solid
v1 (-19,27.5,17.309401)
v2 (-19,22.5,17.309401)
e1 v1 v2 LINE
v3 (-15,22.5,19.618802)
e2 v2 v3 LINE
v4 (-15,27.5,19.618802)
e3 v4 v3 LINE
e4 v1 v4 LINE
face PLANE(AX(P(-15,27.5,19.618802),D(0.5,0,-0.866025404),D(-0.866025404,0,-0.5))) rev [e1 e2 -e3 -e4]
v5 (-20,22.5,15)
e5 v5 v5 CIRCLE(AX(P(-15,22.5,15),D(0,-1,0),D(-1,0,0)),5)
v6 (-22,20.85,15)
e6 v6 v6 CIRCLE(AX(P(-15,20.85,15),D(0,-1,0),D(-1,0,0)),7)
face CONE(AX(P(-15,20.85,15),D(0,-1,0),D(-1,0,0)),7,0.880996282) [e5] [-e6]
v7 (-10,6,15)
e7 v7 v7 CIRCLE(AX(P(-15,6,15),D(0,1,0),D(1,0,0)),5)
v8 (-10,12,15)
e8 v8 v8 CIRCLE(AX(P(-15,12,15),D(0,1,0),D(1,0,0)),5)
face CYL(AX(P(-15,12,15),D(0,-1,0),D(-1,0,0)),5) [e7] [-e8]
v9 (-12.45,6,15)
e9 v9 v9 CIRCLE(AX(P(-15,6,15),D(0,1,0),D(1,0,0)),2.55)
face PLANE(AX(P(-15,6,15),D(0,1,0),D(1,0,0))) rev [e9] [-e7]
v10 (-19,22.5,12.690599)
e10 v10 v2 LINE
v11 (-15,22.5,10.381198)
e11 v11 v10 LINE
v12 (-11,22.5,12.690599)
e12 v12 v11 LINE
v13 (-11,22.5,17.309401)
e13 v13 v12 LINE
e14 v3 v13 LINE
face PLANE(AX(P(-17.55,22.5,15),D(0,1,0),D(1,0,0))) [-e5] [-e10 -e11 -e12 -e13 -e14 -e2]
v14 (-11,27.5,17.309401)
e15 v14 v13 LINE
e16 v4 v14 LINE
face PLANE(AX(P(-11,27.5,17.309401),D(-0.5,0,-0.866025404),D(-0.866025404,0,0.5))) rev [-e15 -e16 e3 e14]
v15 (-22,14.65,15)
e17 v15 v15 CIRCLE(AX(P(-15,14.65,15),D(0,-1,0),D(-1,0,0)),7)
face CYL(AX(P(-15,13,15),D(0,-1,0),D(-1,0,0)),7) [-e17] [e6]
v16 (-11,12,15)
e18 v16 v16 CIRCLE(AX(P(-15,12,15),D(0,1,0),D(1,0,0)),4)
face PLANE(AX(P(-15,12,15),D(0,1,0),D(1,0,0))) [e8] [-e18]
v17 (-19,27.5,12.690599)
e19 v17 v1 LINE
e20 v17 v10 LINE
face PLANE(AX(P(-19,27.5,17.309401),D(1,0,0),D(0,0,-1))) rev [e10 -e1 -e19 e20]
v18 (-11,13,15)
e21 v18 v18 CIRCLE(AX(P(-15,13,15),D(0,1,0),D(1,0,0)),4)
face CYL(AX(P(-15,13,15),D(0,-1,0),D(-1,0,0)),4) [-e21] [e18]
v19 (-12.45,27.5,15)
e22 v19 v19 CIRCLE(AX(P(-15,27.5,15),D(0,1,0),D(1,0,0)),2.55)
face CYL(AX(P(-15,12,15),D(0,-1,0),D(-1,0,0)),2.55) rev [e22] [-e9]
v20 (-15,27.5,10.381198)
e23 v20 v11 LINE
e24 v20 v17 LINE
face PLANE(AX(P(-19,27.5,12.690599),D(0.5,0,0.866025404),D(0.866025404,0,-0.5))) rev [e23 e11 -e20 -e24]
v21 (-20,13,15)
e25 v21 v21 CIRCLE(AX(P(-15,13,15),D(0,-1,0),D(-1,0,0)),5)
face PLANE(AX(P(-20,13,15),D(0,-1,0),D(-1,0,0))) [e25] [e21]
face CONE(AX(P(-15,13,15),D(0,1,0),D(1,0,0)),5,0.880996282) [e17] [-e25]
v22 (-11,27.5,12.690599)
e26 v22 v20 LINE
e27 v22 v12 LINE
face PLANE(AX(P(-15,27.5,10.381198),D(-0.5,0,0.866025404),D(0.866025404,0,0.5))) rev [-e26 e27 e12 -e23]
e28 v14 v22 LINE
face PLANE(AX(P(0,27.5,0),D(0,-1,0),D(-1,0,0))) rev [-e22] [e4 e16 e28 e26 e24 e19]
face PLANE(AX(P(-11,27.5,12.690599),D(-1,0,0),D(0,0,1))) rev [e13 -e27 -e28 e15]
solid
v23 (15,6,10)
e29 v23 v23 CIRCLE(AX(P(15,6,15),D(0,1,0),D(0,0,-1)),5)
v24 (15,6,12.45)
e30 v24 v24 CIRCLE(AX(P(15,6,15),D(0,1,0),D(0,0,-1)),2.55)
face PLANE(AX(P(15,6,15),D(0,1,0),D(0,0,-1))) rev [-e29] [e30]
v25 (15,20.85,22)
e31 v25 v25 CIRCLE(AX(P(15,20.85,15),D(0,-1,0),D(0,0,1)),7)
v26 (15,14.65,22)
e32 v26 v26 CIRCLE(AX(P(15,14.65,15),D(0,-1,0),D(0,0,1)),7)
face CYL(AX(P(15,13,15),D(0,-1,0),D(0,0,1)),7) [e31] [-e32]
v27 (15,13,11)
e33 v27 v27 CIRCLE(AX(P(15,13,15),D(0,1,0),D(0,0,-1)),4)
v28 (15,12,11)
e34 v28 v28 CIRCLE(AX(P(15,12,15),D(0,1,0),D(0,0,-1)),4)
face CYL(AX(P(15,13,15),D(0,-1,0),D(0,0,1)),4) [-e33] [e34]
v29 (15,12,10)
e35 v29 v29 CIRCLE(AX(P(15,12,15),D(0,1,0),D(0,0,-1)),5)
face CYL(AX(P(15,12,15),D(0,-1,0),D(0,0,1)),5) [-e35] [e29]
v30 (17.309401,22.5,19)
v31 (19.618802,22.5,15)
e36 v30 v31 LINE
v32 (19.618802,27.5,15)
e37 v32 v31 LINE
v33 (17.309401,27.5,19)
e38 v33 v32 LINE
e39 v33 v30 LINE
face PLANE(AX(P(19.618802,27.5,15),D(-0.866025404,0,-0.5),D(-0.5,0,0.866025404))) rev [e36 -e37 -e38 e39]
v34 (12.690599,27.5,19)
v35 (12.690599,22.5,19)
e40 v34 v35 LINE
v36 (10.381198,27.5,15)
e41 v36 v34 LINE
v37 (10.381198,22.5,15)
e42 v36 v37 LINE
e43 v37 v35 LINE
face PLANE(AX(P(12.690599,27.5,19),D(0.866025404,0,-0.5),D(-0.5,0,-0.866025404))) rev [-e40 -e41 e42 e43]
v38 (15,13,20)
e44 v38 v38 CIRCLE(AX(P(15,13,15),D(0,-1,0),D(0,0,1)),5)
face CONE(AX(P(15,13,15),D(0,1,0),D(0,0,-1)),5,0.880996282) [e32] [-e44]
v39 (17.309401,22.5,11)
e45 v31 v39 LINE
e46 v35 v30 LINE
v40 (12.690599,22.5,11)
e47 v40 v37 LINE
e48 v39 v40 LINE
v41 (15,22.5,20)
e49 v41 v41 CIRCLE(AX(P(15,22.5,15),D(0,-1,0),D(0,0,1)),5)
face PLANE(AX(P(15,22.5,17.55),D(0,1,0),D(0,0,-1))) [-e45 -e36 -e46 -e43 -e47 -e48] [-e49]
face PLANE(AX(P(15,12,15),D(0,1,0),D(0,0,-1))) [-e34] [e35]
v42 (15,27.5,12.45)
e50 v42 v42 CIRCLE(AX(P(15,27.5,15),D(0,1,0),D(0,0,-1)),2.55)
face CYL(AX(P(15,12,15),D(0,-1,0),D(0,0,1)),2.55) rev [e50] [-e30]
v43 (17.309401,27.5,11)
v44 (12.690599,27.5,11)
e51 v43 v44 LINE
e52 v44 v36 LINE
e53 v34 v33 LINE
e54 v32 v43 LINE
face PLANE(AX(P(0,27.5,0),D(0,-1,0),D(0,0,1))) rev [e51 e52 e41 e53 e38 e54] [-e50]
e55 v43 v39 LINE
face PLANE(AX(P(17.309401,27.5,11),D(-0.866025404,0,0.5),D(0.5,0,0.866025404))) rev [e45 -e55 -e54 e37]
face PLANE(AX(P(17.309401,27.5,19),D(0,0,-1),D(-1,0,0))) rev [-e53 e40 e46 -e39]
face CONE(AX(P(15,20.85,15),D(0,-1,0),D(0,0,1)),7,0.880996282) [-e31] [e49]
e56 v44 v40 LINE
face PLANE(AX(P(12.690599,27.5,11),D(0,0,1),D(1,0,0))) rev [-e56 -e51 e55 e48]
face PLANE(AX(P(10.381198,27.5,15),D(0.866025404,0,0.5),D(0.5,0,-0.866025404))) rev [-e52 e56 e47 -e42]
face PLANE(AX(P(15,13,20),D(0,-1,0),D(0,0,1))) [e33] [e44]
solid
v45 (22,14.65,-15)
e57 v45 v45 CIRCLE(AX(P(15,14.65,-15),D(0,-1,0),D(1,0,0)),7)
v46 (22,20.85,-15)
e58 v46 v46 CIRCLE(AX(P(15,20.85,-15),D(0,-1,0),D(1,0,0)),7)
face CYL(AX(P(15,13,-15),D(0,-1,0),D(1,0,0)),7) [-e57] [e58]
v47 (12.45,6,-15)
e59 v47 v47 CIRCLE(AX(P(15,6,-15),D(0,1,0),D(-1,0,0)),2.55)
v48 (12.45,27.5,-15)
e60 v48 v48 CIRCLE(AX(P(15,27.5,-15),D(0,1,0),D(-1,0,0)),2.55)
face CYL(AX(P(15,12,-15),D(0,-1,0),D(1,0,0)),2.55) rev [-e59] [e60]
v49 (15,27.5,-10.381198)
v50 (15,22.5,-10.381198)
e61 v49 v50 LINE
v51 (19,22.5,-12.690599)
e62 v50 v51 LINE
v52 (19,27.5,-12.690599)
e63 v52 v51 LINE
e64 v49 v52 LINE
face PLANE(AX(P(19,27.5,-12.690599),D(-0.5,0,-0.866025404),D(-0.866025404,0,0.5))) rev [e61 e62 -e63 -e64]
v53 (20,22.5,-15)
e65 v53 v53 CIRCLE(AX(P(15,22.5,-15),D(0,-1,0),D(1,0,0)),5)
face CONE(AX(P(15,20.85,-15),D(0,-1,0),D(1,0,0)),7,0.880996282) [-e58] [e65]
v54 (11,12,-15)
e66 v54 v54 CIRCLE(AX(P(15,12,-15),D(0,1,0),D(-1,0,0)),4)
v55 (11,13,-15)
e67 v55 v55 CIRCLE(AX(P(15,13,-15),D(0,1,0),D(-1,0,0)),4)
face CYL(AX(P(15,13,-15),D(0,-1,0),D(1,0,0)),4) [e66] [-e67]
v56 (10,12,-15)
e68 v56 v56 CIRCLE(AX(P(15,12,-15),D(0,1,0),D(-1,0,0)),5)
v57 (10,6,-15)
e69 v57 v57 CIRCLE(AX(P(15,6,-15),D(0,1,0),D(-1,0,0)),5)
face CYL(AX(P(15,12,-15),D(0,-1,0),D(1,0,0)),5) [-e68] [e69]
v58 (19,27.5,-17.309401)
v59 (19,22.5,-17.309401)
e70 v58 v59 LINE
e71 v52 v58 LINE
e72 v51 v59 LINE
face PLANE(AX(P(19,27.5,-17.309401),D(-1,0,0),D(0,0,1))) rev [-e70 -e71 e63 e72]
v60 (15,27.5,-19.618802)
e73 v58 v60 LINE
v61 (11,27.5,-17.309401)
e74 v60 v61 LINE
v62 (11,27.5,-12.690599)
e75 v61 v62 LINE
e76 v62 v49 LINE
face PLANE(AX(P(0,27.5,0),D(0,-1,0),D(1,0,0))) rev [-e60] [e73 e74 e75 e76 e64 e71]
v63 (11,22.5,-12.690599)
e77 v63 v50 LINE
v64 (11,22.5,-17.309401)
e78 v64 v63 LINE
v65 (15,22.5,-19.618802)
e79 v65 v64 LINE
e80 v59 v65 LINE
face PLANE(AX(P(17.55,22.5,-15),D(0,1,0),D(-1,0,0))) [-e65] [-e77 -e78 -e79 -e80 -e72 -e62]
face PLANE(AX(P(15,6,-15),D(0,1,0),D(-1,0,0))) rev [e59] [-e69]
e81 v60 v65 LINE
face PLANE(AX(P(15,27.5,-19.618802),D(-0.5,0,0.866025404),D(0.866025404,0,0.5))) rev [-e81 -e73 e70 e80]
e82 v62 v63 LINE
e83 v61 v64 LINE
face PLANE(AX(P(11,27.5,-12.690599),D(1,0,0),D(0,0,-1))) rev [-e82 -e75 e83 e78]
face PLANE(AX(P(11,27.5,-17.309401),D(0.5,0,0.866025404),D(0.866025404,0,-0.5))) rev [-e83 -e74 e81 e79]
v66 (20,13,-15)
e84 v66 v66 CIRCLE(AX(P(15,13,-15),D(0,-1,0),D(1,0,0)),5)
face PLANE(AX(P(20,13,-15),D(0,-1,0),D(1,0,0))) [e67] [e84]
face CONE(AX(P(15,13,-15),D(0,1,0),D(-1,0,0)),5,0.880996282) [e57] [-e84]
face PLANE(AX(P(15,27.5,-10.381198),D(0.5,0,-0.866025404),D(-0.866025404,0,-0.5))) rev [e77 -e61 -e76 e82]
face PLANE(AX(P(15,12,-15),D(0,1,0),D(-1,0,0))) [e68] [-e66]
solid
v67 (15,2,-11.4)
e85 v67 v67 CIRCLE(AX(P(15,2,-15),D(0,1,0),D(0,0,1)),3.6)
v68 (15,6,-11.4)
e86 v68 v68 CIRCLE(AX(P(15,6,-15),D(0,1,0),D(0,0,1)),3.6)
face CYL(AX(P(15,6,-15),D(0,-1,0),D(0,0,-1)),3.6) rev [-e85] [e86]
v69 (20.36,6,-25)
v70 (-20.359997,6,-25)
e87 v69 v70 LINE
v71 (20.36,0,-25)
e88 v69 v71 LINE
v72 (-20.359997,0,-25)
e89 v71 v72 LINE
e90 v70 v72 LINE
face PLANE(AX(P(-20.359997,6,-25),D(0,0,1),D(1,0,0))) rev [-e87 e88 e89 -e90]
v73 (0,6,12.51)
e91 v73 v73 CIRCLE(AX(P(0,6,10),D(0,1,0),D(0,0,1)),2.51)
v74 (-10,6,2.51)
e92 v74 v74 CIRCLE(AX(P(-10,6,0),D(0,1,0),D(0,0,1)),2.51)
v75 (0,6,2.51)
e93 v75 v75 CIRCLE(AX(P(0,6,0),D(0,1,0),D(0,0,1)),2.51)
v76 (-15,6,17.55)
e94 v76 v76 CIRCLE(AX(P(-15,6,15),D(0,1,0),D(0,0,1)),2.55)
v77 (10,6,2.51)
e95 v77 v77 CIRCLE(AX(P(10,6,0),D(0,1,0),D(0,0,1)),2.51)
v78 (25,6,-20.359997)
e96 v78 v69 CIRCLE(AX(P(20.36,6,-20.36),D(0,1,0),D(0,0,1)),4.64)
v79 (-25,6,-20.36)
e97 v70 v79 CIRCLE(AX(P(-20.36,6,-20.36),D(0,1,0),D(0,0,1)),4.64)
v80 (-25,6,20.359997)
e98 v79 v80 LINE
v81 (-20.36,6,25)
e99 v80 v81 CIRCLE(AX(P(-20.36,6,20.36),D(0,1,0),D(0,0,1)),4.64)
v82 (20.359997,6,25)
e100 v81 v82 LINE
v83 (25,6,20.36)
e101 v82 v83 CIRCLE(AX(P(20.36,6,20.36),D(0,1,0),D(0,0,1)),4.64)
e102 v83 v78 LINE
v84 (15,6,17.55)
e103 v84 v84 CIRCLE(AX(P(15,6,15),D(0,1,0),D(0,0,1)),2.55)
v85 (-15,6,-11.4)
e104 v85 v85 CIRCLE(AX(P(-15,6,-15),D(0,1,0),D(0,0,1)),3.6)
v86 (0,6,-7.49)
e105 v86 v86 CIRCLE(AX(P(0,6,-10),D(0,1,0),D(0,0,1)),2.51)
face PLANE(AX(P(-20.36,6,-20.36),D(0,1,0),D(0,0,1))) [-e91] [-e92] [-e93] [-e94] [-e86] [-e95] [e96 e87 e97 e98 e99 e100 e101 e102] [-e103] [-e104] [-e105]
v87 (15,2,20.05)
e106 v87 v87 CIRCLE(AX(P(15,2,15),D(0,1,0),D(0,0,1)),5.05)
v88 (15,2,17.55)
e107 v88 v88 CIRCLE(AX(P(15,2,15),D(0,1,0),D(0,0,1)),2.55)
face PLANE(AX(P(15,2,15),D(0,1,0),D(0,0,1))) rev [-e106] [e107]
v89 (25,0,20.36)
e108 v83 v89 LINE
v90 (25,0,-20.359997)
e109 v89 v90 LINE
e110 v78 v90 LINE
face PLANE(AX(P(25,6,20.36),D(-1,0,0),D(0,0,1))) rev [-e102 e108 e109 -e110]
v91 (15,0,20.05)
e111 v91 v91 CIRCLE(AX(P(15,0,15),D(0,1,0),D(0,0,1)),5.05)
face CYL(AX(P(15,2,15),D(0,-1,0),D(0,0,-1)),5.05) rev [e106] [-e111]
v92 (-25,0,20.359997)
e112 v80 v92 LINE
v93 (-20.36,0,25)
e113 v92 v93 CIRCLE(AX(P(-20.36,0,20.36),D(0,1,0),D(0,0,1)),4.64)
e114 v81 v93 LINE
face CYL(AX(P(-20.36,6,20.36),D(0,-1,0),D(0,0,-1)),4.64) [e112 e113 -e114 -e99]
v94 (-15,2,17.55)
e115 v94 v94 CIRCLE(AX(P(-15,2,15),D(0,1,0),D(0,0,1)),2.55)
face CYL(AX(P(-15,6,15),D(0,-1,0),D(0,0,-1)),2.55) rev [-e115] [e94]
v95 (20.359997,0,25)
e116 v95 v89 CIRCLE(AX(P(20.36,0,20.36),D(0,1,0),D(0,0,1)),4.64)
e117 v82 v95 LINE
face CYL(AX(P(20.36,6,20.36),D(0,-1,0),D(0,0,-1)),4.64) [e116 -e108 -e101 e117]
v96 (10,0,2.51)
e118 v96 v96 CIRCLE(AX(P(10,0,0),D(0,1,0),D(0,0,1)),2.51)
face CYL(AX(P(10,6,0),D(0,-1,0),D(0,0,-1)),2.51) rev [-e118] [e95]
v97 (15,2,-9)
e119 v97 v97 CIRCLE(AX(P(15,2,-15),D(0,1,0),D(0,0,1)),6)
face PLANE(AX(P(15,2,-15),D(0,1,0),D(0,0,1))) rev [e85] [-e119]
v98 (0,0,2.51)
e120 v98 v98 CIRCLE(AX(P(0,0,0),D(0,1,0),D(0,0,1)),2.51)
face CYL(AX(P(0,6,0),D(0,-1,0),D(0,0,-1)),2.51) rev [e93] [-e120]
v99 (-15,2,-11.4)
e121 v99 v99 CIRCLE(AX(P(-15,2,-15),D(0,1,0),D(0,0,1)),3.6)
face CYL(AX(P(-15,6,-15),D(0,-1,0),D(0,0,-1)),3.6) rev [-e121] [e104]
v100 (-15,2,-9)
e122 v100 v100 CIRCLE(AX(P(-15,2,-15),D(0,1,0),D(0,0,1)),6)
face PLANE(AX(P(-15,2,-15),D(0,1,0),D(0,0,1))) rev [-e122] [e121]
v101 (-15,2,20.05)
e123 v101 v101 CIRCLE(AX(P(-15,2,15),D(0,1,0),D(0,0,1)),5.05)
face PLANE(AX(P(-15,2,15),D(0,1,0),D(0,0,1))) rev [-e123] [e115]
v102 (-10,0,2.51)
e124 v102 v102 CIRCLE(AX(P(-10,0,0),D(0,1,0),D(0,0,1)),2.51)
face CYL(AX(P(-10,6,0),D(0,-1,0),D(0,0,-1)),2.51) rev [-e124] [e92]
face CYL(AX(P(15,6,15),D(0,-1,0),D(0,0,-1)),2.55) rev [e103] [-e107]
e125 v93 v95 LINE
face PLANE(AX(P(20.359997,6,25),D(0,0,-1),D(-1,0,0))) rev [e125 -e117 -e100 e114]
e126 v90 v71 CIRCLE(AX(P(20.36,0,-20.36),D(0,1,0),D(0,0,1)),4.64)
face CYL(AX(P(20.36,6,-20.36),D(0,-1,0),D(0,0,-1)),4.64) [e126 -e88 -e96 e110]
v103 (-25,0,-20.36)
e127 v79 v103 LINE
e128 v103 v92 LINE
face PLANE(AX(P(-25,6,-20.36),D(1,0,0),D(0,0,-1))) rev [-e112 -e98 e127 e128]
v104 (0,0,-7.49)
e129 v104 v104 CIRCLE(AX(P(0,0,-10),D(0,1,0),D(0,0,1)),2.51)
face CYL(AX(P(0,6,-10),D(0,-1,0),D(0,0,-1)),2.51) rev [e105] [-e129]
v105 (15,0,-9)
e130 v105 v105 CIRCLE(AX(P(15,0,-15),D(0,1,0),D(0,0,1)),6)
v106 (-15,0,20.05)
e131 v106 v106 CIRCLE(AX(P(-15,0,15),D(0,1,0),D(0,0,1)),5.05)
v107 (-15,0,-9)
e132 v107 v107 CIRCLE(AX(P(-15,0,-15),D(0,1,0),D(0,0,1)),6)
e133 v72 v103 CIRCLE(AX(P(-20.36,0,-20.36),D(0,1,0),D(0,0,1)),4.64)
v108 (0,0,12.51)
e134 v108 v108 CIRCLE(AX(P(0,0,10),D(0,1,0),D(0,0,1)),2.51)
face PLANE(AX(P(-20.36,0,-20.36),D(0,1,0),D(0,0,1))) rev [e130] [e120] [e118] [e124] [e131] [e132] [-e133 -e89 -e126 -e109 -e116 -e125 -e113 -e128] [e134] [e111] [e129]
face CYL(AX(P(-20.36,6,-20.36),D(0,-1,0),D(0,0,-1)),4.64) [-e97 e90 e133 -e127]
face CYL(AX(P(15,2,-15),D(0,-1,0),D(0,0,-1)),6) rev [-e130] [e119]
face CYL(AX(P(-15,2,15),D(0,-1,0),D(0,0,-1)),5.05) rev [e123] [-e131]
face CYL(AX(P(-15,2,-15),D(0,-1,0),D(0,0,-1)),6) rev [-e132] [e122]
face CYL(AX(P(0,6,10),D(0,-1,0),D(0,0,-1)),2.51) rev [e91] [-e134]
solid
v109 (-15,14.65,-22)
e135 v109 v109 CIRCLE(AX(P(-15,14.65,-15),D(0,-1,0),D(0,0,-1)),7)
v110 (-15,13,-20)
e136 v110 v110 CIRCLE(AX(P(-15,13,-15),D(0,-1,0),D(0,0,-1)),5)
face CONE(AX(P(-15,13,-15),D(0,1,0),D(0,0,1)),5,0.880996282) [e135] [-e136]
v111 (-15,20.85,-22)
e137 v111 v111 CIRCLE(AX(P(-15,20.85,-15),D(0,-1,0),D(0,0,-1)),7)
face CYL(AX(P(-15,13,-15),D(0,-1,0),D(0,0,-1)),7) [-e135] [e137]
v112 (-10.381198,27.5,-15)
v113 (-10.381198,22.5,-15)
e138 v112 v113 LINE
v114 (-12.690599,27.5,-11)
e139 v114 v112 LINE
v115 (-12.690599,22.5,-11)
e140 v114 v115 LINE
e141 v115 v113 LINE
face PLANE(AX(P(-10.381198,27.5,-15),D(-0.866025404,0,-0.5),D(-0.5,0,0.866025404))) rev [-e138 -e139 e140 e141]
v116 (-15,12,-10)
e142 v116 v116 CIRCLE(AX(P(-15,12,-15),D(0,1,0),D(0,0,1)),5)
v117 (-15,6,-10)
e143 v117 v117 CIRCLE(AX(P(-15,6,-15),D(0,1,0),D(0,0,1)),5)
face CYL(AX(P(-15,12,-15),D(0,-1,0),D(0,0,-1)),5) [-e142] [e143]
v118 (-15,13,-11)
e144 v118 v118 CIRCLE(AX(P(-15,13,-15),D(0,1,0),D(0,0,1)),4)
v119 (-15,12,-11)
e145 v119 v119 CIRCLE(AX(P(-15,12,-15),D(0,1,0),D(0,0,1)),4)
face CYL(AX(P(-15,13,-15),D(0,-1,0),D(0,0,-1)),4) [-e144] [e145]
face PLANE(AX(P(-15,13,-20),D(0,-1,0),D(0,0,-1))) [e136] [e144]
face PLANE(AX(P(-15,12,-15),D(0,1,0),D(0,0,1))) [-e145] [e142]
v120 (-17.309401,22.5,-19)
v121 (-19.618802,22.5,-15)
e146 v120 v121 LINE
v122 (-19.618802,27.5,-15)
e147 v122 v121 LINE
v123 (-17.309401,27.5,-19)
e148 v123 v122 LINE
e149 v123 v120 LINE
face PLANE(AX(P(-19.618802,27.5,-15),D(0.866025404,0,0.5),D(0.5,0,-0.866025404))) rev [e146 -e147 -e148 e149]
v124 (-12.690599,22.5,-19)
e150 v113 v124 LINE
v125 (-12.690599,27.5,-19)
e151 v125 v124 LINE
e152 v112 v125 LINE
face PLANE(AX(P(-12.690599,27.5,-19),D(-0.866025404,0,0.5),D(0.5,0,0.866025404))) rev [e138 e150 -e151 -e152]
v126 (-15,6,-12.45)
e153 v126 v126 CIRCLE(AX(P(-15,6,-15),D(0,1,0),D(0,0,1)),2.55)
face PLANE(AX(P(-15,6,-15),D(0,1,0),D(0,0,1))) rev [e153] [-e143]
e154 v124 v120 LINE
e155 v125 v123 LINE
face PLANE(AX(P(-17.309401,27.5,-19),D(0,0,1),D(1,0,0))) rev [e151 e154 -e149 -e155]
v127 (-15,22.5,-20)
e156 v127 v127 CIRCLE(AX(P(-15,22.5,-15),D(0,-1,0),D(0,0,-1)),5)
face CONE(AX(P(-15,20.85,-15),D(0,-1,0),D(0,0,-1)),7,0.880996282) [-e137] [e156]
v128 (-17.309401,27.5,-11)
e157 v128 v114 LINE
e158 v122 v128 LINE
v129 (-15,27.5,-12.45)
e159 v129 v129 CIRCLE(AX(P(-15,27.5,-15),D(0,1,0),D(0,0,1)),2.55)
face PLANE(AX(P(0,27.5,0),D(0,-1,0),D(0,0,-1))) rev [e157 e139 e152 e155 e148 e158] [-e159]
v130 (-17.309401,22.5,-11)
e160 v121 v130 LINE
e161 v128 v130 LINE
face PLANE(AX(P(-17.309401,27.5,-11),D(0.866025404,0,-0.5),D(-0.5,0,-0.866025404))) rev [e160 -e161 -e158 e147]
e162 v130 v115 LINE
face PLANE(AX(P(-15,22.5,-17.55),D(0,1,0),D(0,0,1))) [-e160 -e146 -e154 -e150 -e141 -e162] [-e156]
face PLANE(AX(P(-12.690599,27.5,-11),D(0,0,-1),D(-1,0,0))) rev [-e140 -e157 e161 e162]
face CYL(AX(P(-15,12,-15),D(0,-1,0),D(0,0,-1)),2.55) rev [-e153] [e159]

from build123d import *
from build123d.topology import SkipClean

# Parameters (mm, degrees)
SKETCH_1_R                = 3.6
SKETCH_1_R_2              = 2.55
SKETCH_1_R_3              = 2.51
EXTRUDE_1_DEPTH           = 6
SKETCH_2_R                = 6
SKETCH_2_R_2              = 5.05
CUT_EXTRUDE_1_DEPTH       = 2
SKETCH_3_R                = 5
SKETCH_3_R_2              = 2.55
EXTRUDE_1653_DEPTH        = 6
SKETCH_4_R                = 4
SKETCH_4_R_2              = 2.55
EXTRUDE_1789_DEPTH        = 1
SKETCH_6_R                = 2.55
EXTRUDE_2406_DEPTH        = 5
PATTERN_CIRCULAR_10_COUNT = 4


with BuildPart() as part:
    # Эскиз1 → Бобышка-Вытянуть1 (new body)
    with BuildSketch(Plane(origin=(0, 0, 0), x_dir=(1, 0, 0), z_dir=(0, 1, 0))):
        with BuildLine():
            Line((20.359997187, -25), (-20.36, -25))
            ThreePointArc((-20.36, -25), (-23.640976459, -23.64097447), (-25, -20.359997187))
            Line((-25, -20.359997187), (-25, 20.36))
            ThreePointArc((-25, 20.36), (-23.64097447, 23.640976459), (-20.359997187, 25))
            Line((-20.359997187, 25), (20.36, 25))
            ThreePointArc((20.36, 25), (23.640976459, 23.64097447), (25, 20.359997187))
            Line((25, 20.359997187), (25, -20.36))
            ThreePointArc((25, -20.36), (23.64097447, -23.640976459), (20.359997187, -25))
        make_face()
        with Locations((-15, 15)):
            Circle(SKETCH_1_R, mode=Mode.SUBTRACT)
        with Locations((15, 15)):
            Circle(SKETCH_1_R, mode=Mode.SUBTRACT)
        with Locations((15, -15)):
            Circle(SKETCH_1_R_2, mode=Mode.SUBTRACT)
        with Locations((-15, -15)):
            Circle(SKETCH_1_R_2, mode=Mode.SUBTRACT)
        Circle(SKETCH_1_R_3, mode=Mode.SUBTRACT)
        with Locations((0, 10)):
            Circle(SKETCH_1_R_3, mode=Mode.SUBTRACT)
        with Locations((10, 0)):
            Circle(SKETCH_1_R_3, mode=Mode.SUBTRACT)
        with Locations((0, -10)):
            Circle(SKETCH_1_R_3, mode=Mode.SUBTRACT)
        with Locations((-10, 0)):
            Circle(SKETCH_1_R_3, mode=Mode.SUBTRACT)
    extrude(amount=EXTRUDE_1_DEPTH)

    # Эскиз2 → Вырез-Вытянуть1 (cut)
    with BuildSketch(Plane(origin=(0, 0, 0), x_dir=(1, 0, 0), z_dir=(0, 1, 0))):
        with Locations((-15, 15)):
            Circle(SKETCH_2_R)
        with Locations((15, 15)):
            Circle(SKETCH_2_R)
        with Locations((-15, -15)):
            Circle(SKETCH_2_R_2)
        with Locations((15, -15)):
            Circle(SKETCH_2_R_2)
    extrude(amount=CUT_EXTRUDE_1_DEPTH, mode=Mode.SUBTRACT)


with BuildPart() as body_2:
    # Эскиз3 → Extrude 1653 (new body)
    with BuildSketch(Plane(origin=(0, 6, 0), x_dir=(1, 0, 0), z_dir=(0, 1, 0))):
        with Locations((-15, 15)):
            Circle(SKETCH_3_R)
        with Locations((-15, 15)):
            Circle(SKETCH_3_R_2, mode=Mode.SUBTRACT)
    extrude(amount=EXTRUDE_1653_DEPTH)

    # Эскиз4 → Extrude 1789 (add)
    with BuildSketch(Plane(origin=(0, 12, 0), x_dir=(1, 0, 0), z_dir=(0, 1, 0))):
        with Locations((-15, 15)):
            Circle(SKETCH_4_R)
        with Locations((-15, 15)):
            Circle(SKETCH_4_R_2, mode=Mode.SUBTRACT)
    extrude(amount=EXTRUDE_1789_DEPTH)

    # Эскиз5 → Revolve 2225 (revolve)
    with BuildSketch(Plane(origin=(-15, 0, 0), x_dir=(0, 0, -1), z_dir=(1, 0, 0))):
        Polygon((17.55, 13), (17.55, 22.5), (20, 22.5), (22, 20.85), (22, 14.65), (20, 13), align=None)
    revolve(axis=Axis((-15, 13, -15), (0, 1, 0)))

    # Эскиз6 → Extrude 2406 (add)
    with SkipClean():  # the faces are left unmerged after this step: merging them gives an invalid solid
        with BuildSketch(Plane(origin=(0, 22.5, 0), x_dir=(1, 0, 0), z_dir=(0, 1, 0))):
            Polygon((-17.309401077, 11), (-19.618802154, 15), (-17.309401077, 19), (-12.690598923, 19), (-10.381197846, 15), (-12.690598923, 11), align=None)
            with Locations((-15, 15)):
                Circle(SKETCH_6_R, mode=Mode.SUBTRACT)
        extrude(amount=EXTRUDE_2406_DEPTH)
    add(body_2.part.scale(1), mode=Mode.REPLACE)  # the faces are merged on a copy


with BuildPart() as pattern_circular_10_1:
    # Круговой массив10: pattern copy
    add(body_2.part.rotate(Axis((0, 6, 0), (0, -1, 0)), 1 * 360 / PATTERN_CIRCULAR_10_COUNT))


with BuildPart() as pattern_circular_10_2:
    # Круговой массив10: pattern copy
    add(body_2.part.rotate(Axis((0, 6, 0), (0, -1, 0)), 2 * 360 / PATTERN_CIRCULAR_10_COUNT))


with BuildPart() as pattern_circular_10_3:
    # Круговой массив10: pattern copy
    add(body_2.part.rotate(Axis((0, 6, 0), (0, -1, 0)), 3 * 360 / PATTERN_CIRCULAR_10_COUNT))


solid = Compound([part.part, body_2.part, pattern_circular_10_1.part, pattern_circular_10_2.part, pattern_circular_10_3.part])
